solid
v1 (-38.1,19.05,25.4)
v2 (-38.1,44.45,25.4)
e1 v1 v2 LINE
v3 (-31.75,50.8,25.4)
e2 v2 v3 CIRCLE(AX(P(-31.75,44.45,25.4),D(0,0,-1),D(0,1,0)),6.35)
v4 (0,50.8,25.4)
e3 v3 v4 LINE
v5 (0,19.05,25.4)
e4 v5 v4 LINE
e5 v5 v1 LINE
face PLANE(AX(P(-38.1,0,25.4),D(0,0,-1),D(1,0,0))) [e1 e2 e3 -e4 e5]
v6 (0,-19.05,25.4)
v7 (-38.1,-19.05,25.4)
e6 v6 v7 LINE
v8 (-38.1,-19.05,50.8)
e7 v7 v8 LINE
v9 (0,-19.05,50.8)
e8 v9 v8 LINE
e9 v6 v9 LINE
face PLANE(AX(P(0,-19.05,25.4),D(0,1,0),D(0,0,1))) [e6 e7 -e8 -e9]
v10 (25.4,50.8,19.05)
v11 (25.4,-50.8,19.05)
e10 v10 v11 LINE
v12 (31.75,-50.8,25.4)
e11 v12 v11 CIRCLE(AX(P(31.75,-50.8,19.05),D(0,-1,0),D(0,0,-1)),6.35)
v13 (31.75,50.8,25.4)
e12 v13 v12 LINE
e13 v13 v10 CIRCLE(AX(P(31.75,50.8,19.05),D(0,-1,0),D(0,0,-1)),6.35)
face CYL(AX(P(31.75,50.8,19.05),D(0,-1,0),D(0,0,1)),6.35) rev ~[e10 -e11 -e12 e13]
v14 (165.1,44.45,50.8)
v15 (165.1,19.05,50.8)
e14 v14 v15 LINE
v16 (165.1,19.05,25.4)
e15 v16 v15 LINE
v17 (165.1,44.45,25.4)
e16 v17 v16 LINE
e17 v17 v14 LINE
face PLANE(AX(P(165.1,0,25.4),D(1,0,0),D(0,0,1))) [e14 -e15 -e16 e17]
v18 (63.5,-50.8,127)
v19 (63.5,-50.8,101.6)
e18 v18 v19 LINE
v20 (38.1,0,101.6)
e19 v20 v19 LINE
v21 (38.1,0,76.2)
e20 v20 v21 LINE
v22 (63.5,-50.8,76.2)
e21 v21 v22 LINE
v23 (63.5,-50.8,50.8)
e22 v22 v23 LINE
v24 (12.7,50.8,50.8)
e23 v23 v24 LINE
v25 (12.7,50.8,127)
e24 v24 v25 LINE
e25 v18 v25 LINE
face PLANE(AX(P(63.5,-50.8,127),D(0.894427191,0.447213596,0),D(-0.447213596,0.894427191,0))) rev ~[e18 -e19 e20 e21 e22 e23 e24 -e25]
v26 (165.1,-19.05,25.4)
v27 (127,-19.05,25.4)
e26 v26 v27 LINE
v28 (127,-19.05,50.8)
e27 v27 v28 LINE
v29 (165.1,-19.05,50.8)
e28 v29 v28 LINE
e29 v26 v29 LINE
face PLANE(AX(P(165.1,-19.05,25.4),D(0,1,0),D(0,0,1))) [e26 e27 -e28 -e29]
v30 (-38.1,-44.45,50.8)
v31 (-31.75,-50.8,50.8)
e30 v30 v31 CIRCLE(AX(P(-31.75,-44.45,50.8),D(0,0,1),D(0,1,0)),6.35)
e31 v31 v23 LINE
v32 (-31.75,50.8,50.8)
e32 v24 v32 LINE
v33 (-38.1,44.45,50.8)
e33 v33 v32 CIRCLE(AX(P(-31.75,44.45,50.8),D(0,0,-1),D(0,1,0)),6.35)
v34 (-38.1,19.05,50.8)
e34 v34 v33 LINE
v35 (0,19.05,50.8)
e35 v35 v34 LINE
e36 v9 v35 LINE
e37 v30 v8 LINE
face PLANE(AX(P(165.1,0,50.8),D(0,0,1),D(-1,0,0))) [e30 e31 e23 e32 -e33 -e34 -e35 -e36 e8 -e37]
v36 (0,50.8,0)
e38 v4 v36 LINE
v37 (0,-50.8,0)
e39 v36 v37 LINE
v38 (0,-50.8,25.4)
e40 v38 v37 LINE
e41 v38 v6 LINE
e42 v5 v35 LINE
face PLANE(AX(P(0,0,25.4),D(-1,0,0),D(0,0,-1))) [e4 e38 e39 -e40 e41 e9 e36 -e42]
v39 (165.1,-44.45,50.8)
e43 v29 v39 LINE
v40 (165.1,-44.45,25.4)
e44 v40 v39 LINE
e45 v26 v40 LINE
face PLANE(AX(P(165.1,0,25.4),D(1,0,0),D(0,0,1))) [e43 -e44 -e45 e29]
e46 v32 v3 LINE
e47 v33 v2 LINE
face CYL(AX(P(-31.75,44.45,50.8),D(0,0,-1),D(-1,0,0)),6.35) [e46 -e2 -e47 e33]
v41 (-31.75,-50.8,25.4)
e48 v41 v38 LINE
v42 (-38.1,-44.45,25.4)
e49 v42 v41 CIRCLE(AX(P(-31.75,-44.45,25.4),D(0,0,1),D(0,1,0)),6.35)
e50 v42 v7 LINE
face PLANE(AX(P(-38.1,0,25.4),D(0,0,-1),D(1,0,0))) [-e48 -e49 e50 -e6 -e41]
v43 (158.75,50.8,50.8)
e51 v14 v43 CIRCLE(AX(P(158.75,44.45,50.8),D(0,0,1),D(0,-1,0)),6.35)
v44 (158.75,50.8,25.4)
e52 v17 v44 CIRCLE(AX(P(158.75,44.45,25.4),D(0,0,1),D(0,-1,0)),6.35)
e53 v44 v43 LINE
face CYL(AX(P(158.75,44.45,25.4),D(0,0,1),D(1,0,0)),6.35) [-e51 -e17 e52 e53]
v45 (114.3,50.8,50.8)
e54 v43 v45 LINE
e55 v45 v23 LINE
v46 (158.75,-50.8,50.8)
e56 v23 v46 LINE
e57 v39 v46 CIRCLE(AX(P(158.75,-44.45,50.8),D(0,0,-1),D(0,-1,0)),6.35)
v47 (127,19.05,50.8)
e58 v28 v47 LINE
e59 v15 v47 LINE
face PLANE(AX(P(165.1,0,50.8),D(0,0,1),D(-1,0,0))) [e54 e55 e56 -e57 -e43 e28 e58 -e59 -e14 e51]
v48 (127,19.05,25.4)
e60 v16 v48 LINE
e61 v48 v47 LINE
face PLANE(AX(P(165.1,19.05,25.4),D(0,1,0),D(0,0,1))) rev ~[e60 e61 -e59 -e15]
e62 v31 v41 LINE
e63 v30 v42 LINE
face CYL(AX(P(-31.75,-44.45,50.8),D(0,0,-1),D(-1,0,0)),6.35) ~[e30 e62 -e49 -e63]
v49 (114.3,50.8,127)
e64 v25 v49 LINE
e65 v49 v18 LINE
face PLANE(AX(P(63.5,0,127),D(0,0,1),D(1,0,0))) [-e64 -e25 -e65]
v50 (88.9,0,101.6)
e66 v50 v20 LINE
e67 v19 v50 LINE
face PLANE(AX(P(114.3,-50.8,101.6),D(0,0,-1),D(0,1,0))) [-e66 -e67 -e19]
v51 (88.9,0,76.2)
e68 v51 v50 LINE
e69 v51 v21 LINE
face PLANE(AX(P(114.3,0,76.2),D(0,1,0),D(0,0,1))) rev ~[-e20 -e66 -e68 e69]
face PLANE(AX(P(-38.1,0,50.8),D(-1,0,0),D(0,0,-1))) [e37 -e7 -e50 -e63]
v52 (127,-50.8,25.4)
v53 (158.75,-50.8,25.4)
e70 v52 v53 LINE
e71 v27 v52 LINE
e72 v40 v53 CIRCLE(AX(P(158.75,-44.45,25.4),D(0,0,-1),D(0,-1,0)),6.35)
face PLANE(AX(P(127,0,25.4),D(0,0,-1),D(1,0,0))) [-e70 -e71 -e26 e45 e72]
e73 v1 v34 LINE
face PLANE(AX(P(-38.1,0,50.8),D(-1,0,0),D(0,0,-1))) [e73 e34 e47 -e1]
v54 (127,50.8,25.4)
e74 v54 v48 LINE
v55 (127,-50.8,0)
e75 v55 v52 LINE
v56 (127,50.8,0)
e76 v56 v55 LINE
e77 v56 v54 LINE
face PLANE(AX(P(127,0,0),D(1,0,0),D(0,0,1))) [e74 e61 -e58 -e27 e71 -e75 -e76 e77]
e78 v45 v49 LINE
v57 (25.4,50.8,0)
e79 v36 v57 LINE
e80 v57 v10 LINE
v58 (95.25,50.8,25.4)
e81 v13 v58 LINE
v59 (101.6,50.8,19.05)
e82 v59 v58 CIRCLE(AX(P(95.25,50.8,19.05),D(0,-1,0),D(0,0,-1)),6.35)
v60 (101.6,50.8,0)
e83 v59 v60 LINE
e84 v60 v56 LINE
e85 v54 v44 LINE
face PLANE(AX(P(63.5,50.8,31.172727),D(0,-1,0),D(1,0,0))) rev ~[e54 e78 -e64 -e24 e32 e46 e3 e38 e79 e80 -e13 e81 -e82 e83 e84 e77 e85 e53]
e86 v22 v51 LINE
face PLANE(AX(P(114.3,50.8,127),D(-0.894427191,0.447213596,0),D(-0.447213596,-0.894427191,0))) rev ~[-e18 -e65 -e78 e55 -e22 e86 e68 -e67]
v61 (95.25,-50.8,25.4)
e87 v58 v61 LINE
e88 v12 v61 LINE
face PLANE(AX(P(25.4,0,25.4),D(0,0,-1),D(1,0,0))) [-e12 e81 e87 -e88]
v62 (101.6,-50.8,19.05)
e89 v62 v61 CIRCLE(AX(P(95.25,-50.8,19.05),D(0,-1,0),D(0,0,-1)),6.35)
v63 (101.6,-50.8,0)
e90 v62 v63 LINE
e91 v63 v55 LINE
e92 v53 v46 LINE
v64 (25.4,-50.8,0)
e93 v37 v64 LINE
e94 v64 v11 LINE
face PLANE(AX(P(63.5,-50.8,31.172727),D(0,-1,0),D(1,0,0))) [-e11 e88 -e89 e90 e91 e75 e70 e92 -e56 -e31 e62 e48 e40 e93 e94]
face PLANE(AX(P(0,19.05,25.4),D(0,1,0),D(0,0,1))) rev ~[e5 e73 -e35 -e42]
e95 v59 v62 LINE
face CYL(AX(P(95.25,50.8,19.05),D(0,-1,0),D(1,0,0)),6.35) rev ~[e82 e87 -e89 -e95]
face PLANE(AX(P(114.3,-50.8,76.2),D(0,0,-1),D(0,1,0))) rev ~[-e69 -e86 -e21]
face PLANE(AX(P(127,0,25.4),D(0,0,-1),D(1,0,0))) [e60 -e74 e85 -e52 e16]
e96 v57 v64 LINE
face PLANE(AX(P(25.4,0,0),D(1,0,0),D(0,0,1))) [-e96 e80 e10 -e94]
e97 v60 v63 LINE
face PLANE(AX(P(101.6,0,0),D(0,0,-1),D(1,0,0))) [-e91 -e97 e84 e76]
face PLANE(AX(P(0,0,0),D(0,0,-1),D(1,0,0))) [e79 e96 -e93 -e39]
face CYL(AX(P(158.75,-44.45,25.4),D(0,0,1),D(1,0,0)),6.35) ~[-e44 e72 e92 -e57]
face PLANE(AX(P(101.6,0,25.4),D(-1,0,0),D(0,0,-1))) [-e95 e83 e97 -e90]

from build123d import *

# Parameters (mm, degrees)
F1_DEPTH  = 50.8
F2_R      = 6.35
F3_R      = 6.35
F4_W      = 38.1
F4_H      = 25.4
F5_DEPTH  = 38.1
F6_W      = 38.1
F6_H      = 25.4
F7_DEPTH  = 38.1
F8_W      = 101.6
F8_H      = 101.6
F9_DEPTH  = 76.2
F10_W     = 50.8
F10_H     = 25.4
F11_DEPTH = 152.401
F13_DEPTH = 76.2
F14_DEPTH = 76.2


# Not quite as in the source:
# - a feature names something its author has since deleted; it is built from what else it names


with BuildPart() as f1:
    # F0 (on Front) → F1 (new body, symmetric)
    with BuildSketch(Plane.XZ):
        Polygon((0, 25.4), (0, 0), (25.4, 0), (25.4, 25.4), (101.6, 25.4), (101.6, 0), (127, 0), (127, 25.4), (165.1, 25.4), (165.1, 50.8), (-38.1, 50.8), (-38.1, 25.4), align=None)
    extrude(amount=F1_DEPTH, both=True)

    # F2
    f2_edges = [f1.edges().sort_by_distance(p)[0] for p in [
        (165.1, -50.8, 38.1),
        (165.1, 50.8, 38.1),
        (-38.1, -50.8, 38.1),
        (-38.1, 50.8, 38.1),
    ]]
    fillet(f2_edges, radius=F2_R)

    # F3
    f3_edges = [f1.edges().sort_by_distance(p)[0] for p in [
        (25.4, 0, 25.4),
        (101.6, 0, 25.4),
    ]]
    fillet(f3_edges, radius=F3_R)

    # F4 (on face) → F5 (cut)
    with BuildSketch(Plane.YZ.offset(165.1)):
        with Locations((0, 38.1)):
            Rectangle(F4_W, F4_H)
    extrude(amount=-F5_DEPTH, mode=Mode.SUBTRACT)

    # F6 (on Right) → F7 (cut)
    with BuildSketch(Plane.YZ):
        with Locations((0, 38.1)):
            Rectangle(F6_W, F6_H)
    extrude(amount=-F7_DEPTH, mode=Mode.SUBTRACT)

    # F8 (on face) → F9 (join)
    with BuildSketch(Plane.XY.offset(50.8)):
        with Locations((63.5, 0)):
            Rectangle(F8_W, F8_H)
    extrude(amount=F9_DEPTH)

    # F10 (on face) → F11 (cut, through all)
    with BuildSketch(Plane.YZ.offset(114.3)):
        with Locations((-25.4, 88.9)):
            Rectangle(F10_W, F10_H)
    extrude(amount=-F11_DEPTH, mode=Mode.SUBTRACT)

    # F12 (on face) → F13 (cut, through all)
    with BuildSketch(Plane.XY.offset(127)):
        Polygon((12.7, -50.8), (63.5, -50.8), (12.7, 50.8), align=None)
    extrude(amount=-F13_DEPTH, mode=Mode.SUBTRACT)

    # F12 (on face) → F14 (cut, through all)
    with BuildSketch(Plane.XY.offset(127)):
        Polygon((114.3, 50.8), (63.5, -50.8), (114.3, -50.8), align=None)
    extrude(amount=-F14_DEPTH, mode=Mode.SUBTRACT)


solid = f1.part
